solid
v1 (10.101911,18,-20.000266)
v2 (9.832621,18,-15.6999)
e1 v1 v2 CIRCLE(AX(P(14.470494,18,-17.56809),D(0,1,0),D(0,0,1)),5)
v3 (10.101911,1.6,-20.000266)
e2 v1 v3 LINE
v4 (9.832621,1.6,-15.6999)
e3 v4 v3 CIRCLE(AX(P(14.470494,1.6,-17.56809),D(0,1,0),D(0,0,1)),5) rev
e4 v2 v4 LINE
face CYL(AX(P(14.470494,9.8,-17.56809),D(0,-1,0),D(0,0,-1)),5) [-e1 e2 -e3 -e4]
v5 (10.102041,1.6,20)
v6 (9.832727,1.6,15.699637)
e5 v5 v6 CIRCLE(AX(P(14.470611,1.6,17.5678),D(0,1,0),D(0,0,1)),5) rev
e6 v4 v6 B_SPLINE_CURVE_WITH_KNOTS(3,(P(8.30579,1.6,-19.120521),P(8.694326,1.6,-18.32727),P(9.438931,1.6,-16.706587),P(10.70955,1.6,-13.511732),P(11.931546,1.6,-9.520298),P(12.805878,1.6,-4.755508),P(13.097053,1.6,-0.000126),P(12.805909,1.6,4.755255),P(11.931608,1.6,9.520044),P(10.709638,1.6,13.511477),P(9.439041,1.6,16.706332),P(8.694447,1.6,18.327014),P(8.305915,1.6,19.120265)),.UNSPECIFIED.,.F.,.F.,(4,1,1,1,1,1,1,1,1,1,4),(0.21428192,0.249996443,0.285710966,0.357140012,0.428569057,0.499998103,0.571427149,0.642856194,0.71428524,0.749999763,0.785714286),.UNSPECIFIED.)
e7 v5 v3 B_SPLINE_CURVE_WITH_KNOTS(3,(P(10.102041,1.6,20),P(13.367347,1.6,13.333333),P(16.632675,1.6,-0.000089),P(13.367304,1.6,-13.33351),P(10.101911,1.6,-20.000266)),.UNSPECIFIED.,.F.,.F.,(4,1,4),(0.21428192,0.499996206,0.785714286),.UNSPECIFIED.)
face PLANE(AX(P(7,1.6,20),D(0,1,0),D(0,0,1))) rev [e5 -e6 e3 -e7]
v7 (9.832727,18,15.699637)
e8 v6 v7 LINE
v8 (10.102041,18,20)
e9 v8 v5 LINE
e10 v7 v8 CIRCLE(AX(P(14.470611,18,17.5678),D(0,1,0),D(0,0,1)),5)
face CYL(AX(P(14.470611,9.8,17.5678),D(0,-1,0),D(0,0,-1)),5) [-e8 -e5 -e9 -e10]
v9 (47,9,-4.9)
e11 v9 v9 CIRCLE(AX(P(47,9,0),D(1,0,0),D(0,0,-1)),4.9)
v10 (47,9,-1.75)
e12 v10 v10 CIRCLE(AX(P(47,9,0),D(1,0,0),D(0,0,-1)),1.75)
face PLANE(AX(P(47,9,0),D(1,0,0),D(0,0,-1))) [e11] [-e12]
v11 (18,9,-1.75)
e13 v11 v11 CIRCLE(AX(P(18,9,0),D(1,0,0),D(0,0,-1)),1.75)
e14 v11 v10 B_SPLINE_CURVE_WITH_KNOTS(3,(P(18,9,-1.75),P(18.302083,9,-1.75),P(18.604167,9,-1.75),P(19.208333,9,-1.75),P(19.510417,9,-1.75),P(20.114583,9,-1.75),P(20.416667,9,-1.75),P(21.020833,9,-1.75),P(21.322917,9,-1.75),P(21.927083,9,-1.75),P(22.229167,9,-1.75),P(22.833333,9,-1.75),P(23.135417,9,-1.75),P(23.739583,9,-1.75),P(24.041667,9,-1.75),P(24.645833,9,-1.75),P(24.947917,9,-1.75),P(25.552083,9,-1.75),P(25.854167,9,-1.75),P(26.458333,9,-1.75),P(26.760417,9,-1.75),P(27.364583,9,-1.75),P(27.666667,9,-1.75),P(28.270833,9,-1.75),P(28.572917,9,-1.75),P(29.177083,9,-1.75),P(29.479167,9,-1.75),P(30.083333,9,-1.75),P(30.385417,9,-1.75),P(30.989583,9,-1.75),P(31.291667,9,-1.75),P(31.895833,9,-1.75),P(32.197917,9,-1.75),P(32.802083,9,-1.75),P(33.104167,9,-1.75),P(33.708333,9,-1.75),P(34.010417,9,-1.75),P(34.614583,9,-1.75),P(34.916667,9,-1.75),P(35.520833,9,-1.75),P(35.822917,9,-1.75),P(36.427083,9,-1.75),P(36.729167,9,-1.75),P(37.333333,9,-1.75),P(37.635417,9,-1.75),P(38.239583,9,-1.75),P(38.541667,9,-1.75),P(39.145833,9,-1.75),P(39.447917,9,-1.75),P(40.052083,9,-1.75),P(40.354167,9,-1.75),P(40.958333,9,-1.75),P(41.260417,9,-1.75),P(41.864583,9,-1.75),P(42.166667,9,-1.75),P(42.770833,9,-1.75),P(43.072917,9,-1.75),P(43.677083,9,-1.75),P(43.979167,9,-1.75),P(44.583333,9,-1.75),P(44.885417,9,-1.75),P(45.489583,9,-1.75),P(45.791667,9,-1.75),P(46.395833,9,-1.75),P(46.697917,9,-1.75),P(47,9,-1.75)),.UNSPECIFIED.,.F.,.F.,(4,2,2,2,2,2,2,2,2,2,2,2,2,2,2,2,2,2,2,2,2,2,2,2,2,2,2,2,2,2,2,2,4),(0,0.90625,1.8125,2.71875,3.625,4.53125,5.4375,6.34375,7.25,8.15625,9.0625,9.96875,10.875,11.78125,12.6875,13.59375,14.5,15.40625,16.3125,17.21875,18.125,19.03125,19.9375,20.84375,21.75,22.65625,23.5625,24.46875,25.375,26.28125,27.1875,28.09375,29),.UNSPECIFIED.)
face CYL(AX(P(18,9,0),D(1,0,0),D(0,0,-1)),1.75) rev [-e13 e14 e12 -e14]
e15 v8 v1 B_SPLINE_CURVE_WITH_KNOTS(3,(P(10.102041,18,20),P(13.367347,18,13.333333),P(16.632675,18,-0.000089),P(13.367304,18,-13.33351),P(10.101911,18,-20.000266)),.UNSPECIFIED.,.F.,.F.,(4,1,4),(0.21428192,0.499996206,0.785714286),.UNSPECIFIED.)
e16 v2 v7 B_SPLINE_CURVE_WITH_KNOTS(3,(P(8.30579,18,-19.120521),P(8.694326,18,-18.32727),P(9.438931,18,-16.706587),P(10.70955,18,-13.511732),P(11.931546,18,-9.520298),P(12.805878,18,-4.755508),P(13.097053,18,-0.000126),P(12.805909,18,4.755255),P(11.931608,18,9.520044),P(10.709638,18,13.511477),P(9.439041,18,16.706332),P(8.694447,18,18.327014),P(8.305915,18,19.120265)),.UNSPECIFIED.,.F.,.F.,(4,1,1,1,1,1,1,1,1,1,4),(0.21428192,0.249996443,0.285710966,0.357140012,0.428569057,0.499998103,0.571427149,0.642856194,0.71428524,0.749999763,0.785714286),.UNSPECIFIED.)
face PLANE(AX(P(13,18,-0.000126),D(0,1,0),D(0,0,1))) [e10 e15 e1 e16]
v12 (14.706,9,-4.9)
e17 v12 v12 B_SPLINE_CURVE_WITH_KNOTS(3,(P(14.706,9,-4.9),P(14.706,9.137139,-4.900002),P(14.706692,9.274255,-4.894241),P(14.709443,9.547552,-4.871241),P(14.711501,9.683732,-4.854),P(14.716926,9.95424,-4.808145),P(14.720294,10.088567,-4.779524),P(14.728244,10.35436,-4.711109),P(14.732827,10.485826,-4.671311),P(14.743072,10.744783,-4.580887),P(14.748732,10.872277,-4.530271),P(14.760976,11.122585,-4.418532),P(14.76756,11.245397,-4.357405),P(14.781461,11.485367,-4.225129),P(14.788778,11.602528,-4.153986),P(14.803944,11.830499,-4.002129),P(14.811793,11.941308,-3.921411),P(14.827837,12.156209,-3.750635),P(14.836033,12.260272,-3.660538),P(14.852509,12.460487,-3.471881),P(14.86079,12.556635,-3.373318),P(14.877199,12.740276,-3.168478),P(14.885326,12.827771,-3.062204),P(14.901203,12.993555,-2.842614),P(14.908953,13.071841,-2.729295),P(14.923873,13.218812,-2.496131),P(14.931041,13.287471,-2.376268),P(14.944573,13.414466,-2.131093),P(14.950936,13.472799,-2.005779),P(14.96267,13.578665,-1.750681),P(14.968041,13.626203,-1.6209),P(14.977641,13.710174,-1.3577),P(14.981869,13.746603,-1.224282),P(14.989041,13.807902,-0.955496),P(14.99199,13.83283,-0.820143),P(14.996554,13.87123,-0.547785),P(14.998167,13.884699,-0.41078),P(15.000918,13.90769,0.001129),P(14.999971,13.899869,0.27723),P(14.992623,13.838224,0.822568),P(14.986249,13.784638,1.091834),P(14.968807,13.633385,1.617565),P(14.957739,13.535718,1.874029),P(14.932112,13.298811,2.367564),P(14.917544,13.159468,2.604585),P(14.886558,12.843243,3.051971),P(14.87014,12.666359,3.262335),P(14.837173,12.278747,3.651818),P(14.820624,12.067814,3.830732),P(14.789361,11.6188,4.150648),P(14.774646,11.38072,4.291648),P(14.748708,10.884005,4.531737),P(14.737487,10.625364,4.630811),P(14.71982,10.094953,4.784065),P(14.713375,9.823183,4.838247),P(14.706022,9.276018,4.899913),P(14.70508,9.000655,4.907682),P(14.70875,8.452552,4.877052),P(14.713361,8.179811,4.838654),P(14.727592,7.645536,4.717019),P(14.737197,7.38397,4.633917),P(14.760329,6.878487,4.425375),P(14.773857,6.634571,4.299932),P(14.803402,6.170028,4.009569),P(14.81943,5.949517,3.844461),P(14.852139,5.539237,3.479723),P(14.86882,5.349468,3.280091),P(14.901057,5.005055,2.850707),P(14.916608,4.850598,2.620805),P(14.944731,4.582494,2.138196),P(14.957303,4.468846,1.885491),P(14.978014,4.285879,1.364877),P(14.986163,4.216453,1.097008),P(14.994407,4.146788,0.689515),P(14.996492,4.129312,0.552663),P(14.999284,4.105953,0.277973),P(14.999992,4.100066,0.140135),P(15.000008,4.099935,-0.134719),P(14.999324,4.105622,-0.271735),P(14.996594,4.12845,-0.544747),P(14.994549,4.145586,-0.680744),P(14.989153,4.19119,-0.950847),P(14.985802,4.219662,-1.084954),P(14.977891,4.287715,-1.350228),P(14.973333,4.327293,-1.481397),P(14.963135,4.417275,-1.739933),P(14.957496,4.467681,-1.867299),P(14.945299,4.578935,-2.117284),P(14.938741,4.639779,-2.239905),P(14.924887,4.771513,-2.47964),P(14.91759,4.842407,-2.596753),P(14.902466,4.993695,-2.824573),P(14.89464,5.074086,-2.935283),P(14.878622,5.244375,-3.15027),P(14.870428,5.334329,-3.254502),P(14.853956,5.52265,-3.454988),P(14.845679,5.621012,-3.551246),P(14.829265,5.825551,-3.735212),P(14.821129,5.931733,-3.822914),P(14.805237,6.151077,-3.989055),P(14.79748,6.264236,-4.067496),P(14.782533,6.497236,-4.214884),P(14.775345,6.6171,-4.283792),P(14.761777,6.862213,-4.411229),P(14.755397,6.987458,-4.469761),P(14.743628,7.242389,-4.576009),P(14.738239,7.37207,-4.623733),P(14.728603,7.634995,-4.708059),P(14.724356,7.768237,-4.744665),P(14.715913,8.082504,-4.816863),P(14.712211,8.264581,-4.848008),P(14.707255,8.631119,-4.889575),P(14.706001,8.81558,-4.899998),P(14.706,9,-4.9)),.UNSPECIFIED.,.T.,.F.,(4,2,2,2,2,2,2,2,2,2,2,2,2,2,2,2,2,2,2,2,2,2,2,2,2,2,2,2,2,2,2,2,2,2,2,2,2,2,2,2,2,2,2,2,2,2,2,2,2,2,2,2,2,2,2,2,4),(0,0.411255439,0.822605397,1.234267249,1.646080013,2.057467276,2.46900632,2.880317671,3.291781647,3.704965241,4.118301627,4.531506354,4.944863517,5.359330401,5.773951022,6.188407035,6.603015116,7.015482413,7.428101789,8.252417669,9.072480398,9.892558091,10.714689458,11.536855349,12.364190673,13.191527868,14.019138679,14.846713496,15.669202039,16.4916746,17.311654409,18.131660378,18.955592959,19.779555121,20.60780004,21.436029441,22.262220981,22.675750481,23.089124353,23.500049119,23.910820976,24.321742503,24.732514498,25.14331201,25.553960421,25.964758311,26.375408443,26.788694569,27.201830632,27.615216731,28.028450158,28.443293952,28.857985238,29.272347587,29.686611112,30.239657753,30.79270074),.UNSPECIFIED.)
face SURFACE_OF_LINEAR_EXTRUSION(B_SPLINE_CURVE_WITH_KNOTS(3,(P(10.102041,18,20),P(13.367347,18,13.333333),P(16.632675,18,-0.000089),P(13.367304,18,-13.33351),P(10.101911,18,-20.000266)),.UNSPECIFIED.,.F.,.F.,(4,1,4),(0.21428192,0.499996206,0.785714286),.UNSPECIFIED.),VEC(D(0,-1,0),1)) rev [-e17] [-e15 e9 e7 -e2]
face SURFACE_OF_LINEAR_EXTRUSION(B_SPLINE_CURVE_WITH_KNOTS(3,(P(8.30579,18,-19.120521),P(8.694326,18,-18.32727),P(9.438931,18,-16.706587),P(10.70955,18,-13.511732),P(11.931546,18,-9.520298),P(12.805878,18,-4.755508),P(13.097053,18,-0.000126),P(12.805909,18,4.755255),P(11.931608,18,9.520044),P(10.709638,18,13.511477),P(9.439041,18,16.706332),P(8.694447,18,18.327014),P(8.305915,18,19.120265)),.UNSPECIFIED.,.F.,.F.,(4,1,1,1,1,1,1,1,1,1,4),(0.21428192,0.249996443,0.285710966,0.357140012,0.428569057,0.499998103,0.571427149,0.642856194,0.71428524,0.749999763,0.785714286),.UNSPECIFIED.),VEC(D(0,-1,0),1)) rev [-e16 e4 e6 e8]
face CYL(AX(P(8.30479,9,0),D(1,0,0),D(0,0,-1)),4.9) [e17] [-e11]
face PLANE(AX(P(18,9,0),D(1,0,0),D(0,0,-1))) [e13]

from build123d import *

# Parameters (mm, degrees)
BOSS_EXTRUDE1_DEPTH = 18
BOSS_EXTRUDE2_REACH = 30.6
SKETCH2_R           = 4.9
BOSS_EXTRUDE3_START = 29
SKETCH3_R           = 4.9
BOSS_EXTRUDE3_DEPTH = 29
SKETCH4_R           = 1.75
CUT_EXTRUDE1_DEPTH  = 29
SKETCH5_W           = 40.000265569
SKETCH5_H           = 1.6
CUT_EXTRUDE2_DEPTH  = 40
FILLET1_R           = 5


with BuildPart() as part:
    # Sketch1 → Boss-Extrude1 (new body)
    with BuildSketch(Plane(origin=(0, 0, 0), x_dir=(1, 0, 0), z_dir=(0, 1, 0))):
        with BuildLine():
            Line((8.3059154, -19.120265102), (10.102040816, -20))
            add(Edge.make_bspline(
                [(10.101910741, 20.000265569), (13.36730358, 13.333510379), (16.63267474, 8.8523e-05), (13.367346939, -13.333333333), (10.102040816, -20)],
                knots=[0.21428192, 0.21428192, 0.21428192, 0.21428192, 0.5, 0.785714286, 0.785714286, 0.785714286, 0.785714286], degree=3))
            Line((10.101910741, 20.000265569), (8.30578994, 19.12052125))
            add(Edge.make_bspline(
                [(8.30578994, 19.12052125), (8.694326407, 18.327269829), (9.438931208, 16.706587132), (10.709549512, 13.511731918), (11.931546391, 9.520297592), (12.805878251, 4.755507519), (13.097053142, 0.000126231), (12.80590918, -4.755254756), (11.931608442, -9.520044011), (10.709637835, -13.511477312), (9.43904063, -16.706331706), (8.694446639, -18.327013824), (8.3059154, -19.120265102)],
                knots=[0.21428192, 0.21428192, 0.21428192, 0.21428192, 0.249996443, 0.285710966, 0.357140012, 0.428569057, 0.499998103, 0.571427149, 0.642856194, 0.71428524, 0.749999763, 0.785714286, 0.785714286, 0.785714286, 0.785714286], degree=3))
        make_face()
    extrude(amount=BOSS_EXTRUDE1_DEPTH)

    # Sketch2 → Boss-Extrude2 (add, up to next)
    with BuildSketch(Plane(origin=(18, 0, 0), x_dir=(0, 0, -1), z_dir=(1, 0, 0)), mode=Mode.PRIVATE) as boss_extrude2_sk1:
        with Locations((0, 9)):
            Circle(SKETCH2_R)
    boss_extrude2_tool1 = extrude(boss_extrude2_sk1.sketch, amount=-BOSS_EXTRUDE2_REACH, mode=Mode.PRIVATE) - part.part
    add(boss_extrude2_tool1.solids().sort_by_distance((18, 9, 0))[0])

    # Sketch3 → Boss-Extrude3 (add)
    with BuildSketch(Plane(origin=(18, 0, 0), x_dir=(0, 0, -1), z_dir=(1, 0, 0)).offset(BOSS_EXTRUDE3_START)):
        with Locations((0, 9)):
            Circle(SKETCH3_R)
    extrude(amount=-BOSS_EXTRUDE3_DEPTH)

    # Sketch4 → Cut-Extrude1 (cut)
    with BuildSketch(Plane(origin=(47, 0, 0), x_dir=(0, 0, -1), z_dir=(1, 0, 0))):
        with Locations((0, 9)):
            Circle(SKETCH4_R)
    extrude(amount=-CUT_EXTRUDE1_DEPTH, mode=Mode.SUBTRACT)

    # Sketch5 → Cut-Extrude2 (cut)
    with BuildSketch(Plane(origin=(47, 0, 0), x_dir=(0, 0, -1), z_dir=(1, 0, 0))):
        with Locations((0.000132784, 0.8)):
            Rectangle(SKETCH5_W, SKETCH5_H)
    extrude(amount=-CUT_EXTRUDE2_DEPTH, mode=Mode.SUBTRACT)

    # Fillet1
    # the kernel refuses this fillet: 5 mm, written as the material it takes off along each edge
    with BuildSketch(Plane(origin=(8.30578994, -7.764782929, -19.12052125), x_dir=(0.4075991497748225, 0, 0.9131609568432292), z_dir=(0, 1, 0))) as fillet1_piece_1:
        with BuildLine():
            CenterArc((3.930348167, 4.996597215), FILLET1_R, 216.83934776, 51.046703295)
            Line((-0.071250852, 1.998730426), (-0.151282833, 1.93877309))
            ThreePointArc((-0.151282833, 1.93877309), (-0.135561948, 0.99580267), (-0.099936521, -0.003562543))
            Line((-0.099936521, -0.003562543), (0.003562543, -0.099936521))
            ThreePointArc((0.003562543, -0.099936521), (1.872980998, -0.066213211), (3.742224472, -0.099931944))
            Line((3.742224472, -0.099931944), (3.745913172, 0))
        make_face()
    extrude(amount=35.129565858, mode=Mode.SUBTRACT)
    with BuildSketch(Plane(origin=(8.3059154, -7.764778421, 19.120265102), x_dir=(0.8980627079890215, 0, 0.4398674488063712), z_dir=(0, 1, 0))) as fillet1_piece_2:
        with BuildLine():
            CenterArc((4.853404013, 4.105859902), FILLET1_R, 184.155597401, 51.046688752)
            Line((-0.133450663, 3.743533478), (-0.233187757, 3.736286949))
            ThreePointArc((-0.233187757, 3.736286949), (-0.132897152, 1.869432253), (-0.1, 0))
            Line((-0.1, 0), (0, -0.1))
            ThreePointArc((0, -0.1), (1, -0.1), (1.94293192, -0.082117198))
            Line((1.94293192, -0.082117198), (2, 0))
        make_face()
    extrude(amount=35.129556842, mode=Mode.SUBTRACT)


solid = part.part
